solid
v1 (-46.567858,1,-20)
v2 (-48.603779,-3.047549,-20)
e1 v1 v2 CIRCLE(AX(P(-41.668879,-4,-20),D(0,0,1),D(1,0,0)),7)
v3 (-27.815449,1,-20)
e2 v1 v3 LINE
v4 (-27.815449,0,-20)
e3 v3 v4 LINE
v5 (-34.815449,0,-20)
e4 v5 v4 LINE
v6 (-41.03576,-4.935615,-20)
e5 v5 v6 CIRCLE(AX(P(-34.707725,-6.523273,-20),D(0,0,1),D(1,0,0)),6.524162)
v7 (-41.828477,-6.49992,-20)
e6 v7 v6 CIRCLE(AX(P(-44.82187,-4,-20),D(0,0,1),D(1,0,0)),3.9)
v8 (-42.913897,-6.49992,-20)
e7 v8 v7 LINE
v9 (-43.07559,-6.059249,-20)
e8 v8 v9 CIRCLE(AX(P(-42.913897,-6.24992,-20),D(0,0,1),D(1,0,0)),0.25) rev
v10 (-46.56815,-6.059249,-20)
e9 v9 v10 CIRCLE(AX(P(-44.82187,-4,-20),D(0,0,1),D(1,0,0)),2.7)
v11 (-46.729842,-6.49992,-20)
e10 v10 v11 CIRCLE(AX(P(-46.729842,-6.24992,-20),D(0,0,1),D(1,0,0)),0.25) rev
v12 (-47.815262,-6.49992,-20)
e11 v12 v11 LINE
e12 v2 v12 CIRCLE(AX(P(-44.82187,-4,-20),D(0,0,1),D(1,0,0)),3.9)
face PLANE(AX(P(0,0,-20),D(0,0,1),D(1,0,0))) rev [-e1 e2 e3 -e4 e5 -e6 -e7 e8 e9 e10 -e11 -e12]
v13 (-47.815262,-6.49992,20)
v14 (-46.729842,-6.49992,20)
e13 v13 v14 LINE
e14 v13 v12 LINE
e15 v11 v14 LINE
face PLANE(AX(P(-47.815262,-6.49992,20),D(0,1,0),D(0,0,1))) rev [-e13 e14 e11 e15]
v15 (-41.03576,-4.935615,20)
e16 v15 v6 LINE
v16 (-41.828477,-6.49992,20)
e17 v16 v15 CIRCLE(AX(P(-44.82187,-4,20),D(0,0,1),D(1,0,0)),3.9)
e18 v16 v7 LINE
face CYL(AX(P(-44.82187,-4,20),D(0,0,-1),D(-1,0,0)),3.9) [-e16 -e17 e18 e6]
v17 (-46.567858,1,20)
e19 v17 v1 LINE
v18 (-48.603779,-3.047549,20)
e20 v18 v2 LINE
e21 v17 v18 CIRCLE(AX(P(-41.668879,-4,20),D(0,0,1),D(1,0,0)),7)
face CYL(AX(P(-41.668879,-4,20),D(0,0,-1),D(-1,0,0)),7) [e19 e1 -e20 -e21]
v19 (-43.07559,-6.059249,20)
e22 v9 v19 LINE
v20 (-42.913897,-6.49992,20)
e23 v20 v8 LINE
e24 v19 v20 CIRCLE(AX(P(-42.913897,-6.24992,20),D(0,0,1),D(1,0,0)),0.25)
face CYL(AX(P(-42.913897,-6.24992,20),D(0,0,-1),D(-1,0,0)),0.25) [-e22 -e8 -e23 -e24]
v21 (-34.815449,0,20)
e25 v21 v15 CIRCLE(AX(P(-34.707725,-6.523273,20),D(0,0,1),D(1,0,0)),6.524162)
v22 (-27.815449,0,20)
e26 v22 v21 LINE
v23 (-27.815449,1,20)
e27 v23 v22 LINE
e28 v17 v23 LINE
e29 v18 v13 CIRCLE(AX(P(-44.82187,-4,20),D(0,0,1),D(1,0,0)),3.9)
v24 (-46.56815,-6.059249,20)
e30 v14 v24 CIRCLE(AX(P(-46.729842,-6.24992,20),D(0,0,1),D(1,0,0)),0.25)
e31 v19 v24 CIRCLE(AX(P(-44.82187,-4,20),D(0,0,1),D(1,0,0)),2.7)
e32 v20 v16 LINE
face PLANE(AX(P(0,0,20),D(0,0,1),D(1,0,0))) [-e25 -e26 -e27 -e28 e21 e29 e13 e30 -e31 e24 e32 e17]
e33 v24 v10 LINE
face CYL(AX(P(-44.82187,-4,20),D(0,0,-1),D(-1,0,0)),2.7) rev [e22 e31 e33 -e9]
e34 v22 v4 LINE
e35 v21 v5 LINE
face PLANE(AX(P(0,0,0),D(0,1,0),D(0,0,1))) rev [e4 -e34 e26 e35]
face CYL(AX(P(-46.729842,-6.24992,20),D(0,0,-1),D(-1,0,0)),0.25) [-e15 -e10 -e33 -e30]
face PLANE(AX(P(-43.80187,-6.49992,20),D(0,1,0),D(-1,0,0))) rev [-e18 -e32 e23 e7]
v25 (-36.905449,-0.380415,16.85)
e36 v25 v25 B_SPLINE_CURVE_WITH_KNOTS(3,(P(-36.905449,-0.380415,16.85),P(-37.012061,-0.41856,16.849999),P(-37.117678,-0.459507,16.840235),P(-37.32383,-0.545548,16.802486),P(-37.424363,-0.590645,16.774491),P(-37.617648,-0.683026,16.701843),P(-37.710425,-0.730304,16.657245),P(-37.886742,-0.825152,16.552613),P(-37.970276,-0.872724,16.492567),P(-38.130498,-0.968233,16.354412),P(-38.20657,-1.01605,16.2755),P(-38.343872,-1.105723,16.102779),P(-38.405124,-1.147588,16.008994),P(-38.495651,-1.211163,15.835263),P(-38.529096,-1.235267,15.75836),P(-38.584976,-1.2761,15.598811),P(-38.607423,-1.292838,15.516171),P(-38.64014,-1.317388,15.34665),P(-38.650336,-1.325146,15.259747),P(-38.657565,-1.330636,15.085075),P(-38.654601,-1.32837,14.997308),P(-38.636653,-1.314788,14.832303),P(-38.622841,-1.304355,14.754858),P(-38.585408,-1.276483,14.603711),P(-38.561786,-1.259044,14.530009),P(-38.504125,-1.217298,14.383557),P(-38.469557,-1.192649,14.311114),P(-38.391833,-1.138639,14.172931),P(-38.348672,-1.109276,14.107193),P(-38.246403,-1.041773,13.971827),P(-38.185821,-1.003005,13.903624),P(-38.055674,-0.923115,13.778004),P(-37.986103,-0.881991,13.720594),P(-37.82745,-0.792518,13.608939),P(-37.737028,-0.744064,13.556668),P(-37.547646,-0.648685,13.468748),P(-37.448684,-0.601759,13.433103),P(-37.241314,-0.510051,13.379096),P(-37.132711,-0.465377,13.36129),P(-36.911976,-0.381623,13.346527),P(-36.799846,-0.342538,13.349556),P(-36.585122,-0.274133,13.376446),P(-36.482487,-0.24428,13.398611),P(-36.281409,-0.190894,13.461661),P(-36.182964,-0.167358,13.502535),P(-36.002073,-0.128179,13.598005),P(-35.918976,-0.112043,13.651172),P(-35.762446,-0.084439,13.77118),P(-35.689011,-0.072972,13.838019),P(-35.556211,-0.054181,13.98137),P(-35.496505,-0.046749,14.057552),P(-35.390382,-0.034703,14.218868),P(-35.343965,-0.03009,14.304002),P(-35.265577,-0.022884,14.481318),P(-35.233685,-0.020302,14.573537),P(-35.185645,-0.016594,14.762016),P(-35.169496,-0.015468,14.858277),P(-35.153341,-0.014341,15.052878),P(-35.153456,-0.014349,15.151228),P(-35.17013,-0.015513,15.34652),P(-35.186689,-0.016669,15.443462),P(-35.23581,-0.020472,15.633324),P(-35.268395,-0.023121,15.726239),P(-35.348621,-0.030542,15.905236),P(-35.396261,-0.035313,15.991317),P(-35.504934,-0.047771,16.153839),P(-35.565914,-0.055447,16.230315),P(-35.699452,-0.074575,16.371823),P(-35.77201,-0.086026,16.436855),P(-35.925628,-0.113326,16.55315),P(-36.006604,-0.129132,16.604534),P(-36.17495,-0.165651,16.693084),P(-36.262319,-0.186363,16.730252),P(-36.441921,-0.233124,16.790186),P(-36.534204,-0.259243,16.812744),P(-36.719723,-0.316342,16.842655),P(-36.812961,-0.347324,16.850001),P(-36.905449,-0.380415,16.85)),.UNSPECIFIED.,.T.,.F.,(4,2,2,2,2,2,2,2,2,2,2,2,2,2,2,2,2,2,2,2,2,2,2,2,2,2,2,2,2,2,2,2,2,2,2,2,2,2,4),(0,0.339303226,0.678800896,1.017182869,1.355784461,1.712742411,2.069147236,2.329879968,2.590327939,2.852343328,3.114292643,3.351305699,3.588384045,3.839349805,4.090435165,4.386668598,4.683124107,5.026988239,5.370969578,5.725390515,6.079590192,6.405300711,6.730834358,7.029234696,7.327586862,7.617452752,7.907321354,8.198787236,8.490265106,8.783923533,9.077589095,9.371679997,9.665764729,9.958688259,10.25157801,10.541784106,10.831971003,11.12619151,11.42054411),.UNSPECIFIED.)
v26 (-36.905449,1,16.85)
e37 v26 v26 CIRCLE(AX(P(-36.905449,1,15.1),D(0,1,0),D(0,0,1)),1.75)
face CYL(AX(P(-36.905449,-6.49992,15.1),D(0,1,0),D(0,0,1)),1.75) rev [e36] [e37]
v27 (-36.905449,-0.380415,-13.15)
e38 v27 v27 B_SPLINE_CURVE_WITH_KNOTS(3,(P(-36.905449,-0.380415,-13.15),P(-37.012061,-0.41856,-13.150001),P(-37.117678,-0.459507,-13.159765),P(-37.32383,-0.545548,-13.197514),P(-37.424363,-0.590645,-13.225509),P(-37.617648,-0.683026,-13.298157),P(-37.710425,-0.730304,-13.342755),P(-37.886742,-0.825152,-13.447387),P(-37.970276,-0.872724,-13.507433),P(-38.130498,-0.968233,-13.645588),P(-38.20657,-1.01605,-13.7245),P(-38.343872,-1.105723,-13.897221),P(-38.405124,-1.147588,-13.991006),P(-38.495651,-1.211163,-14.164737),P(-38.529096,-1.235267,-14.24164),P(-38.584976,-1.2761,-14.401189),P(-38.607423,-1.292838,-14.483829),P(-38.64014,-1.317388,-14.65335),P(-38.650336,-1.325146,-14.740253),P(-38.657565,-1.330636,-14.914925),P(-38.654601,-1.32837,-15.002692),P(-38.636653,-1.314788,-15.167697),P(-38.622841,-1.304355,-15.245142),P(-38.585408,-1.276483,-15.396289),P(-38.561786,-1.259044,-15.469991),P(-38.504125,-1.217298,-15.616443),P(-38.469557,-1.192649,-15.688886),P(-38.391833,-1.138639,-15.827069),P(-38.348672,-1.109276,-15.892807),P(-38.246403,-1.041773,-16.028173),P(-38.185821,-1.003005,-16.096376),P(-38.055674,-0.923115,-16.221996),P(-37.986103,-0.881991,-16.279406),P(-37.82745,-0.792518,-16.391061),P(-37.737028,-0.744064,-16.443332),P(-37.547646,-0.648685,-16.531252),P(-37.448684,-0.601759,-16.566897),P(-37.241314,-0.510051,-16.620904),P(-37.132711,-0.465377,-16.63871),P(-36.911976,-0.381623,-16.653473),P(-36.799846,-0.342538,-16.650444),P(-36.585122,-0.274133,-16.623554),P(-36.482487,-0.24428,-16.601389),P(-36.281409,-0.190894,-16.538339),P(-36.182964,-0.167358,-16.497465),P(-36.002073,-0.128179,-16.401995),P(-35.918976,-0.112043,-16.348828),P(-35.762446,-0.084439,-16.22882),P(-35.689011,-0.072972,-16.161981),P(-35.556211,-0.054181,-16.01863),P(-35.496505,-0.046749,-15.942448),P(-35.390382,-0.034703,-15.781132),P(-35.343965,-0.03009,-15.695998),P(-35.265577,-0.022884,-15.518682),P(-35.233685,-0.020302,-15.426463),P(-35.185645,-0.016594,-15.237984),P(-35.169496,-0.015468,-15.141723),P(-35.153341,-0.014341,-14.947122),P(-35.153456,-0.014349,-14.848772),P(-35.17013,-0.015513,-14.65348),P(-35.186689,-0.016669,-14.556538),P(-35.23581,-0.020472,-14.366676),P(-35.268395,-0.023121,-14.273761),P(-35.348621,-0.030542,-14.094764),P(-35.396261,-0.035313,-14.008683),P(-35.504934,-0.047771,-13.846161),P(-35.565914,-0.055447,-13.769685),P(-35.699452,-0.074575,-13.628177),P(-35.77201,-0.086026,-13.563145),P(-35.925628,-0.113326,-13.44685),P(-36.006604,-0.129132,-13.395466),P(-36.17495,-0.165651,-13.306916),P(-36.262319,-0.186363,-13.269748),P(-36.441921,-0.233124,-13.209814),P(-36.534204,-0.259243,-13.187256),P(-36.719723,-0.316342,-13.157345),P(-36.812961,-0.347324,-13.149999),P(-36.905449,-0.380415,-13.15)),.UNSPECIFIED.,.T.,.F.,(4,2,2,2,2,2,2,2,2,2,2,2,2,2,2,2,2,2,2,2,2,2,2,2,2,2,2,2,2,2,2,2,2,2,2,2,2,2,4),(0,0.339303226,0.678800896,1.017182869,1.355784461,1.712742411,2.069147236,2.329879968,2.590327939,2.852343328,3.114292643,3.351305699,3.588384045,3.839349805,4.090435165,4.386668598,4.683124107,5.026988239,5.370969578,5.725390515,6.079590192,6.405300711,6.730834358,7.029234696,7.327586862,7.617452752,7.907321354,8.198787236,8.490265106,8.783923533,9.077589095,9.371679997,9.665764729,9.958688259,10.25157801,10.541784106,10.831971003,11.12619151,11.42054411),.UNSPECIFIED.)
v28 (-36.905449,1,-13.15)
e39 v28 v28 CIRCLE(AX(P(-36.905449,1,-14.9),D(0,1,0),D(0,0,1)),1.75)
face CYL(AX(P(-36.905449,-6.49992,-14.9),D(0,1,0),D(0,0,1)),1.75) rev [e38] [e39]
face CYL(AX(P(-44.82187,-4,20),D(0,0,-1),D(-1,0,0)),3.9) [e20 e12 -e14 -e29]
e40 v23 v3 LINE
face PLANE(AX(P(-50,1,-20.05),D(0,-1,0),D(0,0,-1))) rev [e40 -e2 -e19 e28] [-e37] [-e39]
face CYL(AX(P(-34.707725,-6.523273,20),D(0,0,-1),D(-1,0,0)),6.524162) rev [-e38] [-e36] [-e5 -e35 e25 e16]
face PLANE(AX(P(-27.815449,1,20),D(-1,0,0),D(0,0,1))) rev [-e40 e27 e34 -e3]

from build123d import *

# Parameters (mm, degrees)
EXTRUDE_1_DEPTH                            = 3.9
EXTRUDE_3_DEPTH                            = 20
EXTRUDE_5_DEPTH                            = 20
FILLET_1_R                                 = 0.25
FILLET_1_OF_MIRROR_2_R                     = 0.25
SKETCH_7_R                                 = 5.5
CUT_EXTRUDE_3_DEPTH                        = 69.146236458
MIRROR_3_AT_THE_SECOND_PLANE_COPY_1_SKET_R = 5.5
MIRROR_3_AT_THE_SECOND_PLANE_COPY_1_DEPTH  = 69.146236458
ESQUISSE1_W                                = 44.6
ESQUISSE1_H                                = 40
ENL_V_MAT_EXTRU_1_DEPTH                    = 1.54
ENL_V_MAT_EXTRU_2_DEPTH                    = 57.761068742
ESQUISSE3_W                                = 50
ESQUISSE3_H                                = 1.36
ENL_V_MAT_EXTRU_3_DEPTH                    = 64.372466761
ESQUISSE4_W                                = 27.815449133
ESQUISSE4_H                                = 40
ENL_V_MAT_EXTRU_4_DEPTH                    = 54.066651895
ESQUISSE5_R                                = 1.75
ENL_V_MAT_EXTRU_5_DEPTH                    = 54.198396436


with BuildPart() as part:
    # Эскиз1 → Бобышка-Вытянуть1 (new body)
    with BuildSketch(Plane(origin=(0, 0, 0), x_dir=(1, 0, 0), z_dir=(0, 1, 0))):
        with BuildLine():
            ThreePointArc((-44.6, -23.2), (-43.428427125, -26.028427125), (-40.6, -27.2))
            Line((-40.6, -27.2), (40.6, -27.2))
            ThreePointArc((40.6, -27.2), (43.428427125, -26.028427125), (44.6, -23.2))
            Line((44.6, -23.2), (44.6, 23.2))
            ThreePointArc((44.6, 23.2), (43.428427125, 26.028427125), (40.6, 27.2))
            Line((40.6, 27.2), (33.6, 27.2))
            Line((33.6, 27.2), (-5.4, 27.2))
            Line((-5.4, 27.2), (-40.6, 27.2))
            ThreePointArc((-40.6, 27.2), (-43.428427125, 26.028427125), (-44.6, 23.2))
            Line((-44.6, 23.2), (-44.6, -23.2))
        make_face()
    extrude(amount=EXTRUDE_1_DEPTH)



with BuildPart() as body_2:
    # Эскиз3 → Бобышка-Вытянуть3 (new, symmetric)
    with BuildSketch(Plane.XY):
        with BuildLine():
            Line((-47.815262386, -6.499919999), (-45.841869662, -6.499919999))
            ThreePointArc((-45.841869662, -6.499919999), (-44.821869662, -1.3), (-43.801869662, -6.499919999))
            Line((-43.801869662, -6.499919999), (-41.828476938, -6.499919999))
            ThreePointArc((-41.828476938, -6.499919999), (-44.821869662, -0.1), (-47.815262386, -6.499919999))
        make_face()
    extrude_3 = extrude(amount=EXTRUDE_3_DEPTH, both=True)


with BuildPart() as part_1:
    add(part.part)

    add(body_2.part)  # Бобышка-Вытянуть5 merges body 2
    # Эскиз5 → Бобышка-Вытянуть5 (add, symmetric)
    with BuildSketch(Plane.XY):
        with BuildLine():
            ThreePointArc((-41.631827579, 2.999901942), (-46.932438451, 0.61464415), (-48.60377877, -4.952451312))
            Line((-48.60377877, -4.952451312), (-47.348297278, -4.952451312))
            ThreePointArc((-47.348297278, -4.952451312), (-44.821869662, -1.3), (-42.295442046, -4.952451312))
            Line((-42.295442046, -4.952451312), (-41.039960555, -4.952451312))
            ThreePointArc((-41.039960555, -4.952451312), (-38.684888017, -1.351535806), (-34.6, 0))
            Line((-34.6, 0), (-36.641600827, 0.870983001))
            ThreePointArc((-36.641600827, 0.870983001), (-38.922074934, 2.438561027), (-41.631827579, 2.999901942))
        make_face()
    extrude_5 = extrude(amount=EXTRUDE_5_DEPTH, both=True)

    # Скругление1
    fillet_1_edges = [part_1.edges().sort_by_distance(p)[0] for p in [
        (-43.801869662, -6.499919999, 0),
        (-45.841869662, -6.499919999, 0),
    ]]
    fillet(fillet_1_edges, radius=FILLET_1_R)

    # Зеркальное отражение1: Бобышка-Вытянуть5 across plane
    add(extrude_5.mirror(Plane(origin=(0, 0, 0), x_dir=(0, 0, 1), z_dir=(1, 0, 0))))

    # Зеркальное отражение2: Бобышка-Вытянуть3 across plane
    add(extrude_3.mirror(Plane(origin=(0, 0, 0), x_dir=(0, 0, 1), z_dir=(1, 0, 0))))

    # Скругление1 of Зеркальное отражение2
    fillet_1_of_mirror_2_edges = [part_1.edges().sort_by_distance(p)[0] for p in [
        (43.801869662, -6.499919999, 0),
        (45.841869662, -6.499919999, 0),
    ]]
    fillet(fillet_1_of_mirror_2_edges, radius=FILLET_1_OF_MIRROR_2_R)

    # Эскиз7 → Вырез-Вытянуть3 (cut, through all)
    with BuildSketch(Plane.XY.offset(20)):
        with Locations((-45, -4)):
            Circle(SKETCH_7_R)
    cut_extrude_3 = extrude(amount=CUT_EXTRUDE_3_DEPTH, mode=Mode.SUBTRACT)

    # Зеркальное отражение3: Вырез-Вытянуть3 across plane
    add(cut_extrude_3.mirror(Plane(origin=(0, 0, 0), x_dir=(0, 0, 1), z_dir=(1, 0, 0))), mode=Mode.SUBTRACT)

    # Зеркальное отражение3 at the second plane: Вырез-Вытянуть3 across plane
    add(cut_extrude_3.mirror(Plane.XY), mode=Mode.SUBTRACT)

    # Зеркальное отражение3 at the second plane copy 1 sket → Зеркальное отражение3 at the second plane copy 1 (cut, through all)
    with BuildSketch(Plane(origin=(0, 0, -20), x_dir=(-1, 0, 0), z_dir=(0, 0, -1))):
        with Locations((-45, -4)):
            Circle(MIRROR_3_AT_THE_SECOND_PLANE_COPY_1_SKET_R)
    extrude(amount=MIRROR_3_AT_THE_SECOND_PLANE_COPY_1_DEPTH, mode=Mode.SUBTRACT)

    # Esquisse1 → Enlèv. mat.-Extru.1 (cut)
    with BuildSketch(Plane(origin=(0, 3.9, 0), x_dir=(1, 0, 0), z_dir=(0, 1, 0))):
        with Locations((-22.3, 0)):
            Rectangle(ESQUISSE1_W, ESQUISSE1_H)
    extrude(amount=-ENL_V_MAT_EXTRU_1_DEPTH, mode=Mode.SUBTRACT)

    # Esquisse2 → Enlèv. mat.-Extru.2 (cut, through all)
    with BuildSketch(Plane(origin=(0, 3.9, 0), x_dir=(1, 0, 0), z_dir=(0, 1, 0))):
        Polygon((-44.6, 20), (-44.6, 27.2), (51.6, 27.2), (51.6, -27.2), (-44.6, -27.2), (-44.6, -20), (0, -20), (0, 20), align=None)
    extrude(amount=-ENL_V_MAT_EXTRU_2_DEPTH, mode=Mode.SUBTRACT)

    # Esquisse3 → Enlèv. mat.-Extru.3 (cut, through all)
    with BuildSketch(Plane.XY.offset(20)):
        with Locations((-25, 1.68)):
            Rectangle(ESQUISSE3_W, ESQUISSE3_H)
    extrude(amount=-ENL_V_MAT_EXTRU_3_DEPTH, mode=Mode.SUBTRACT)

    # Esquisse4 → Enlèv. mat.-Extru.4 (cut, through all)
    with BuildSketch(Plane.XZ):
        with Locations((-13.907724567, 0)):
            Rectangle(ESQUISSE4_W, ESQUISSE4_H)
    extrude(amount=-ENL_V_MAT_EXTRU_4_DEPTH, mode=Mode.SUBTRACT)

    # Esquisse5 → Enlèv. mat.-Extru.5 (cut, through all)
    with BuildSketch(Plane(origin=(0, 1, 0), x_dir=(1, 0, 0), z_dir=(0, 1, 0))):
        with Locations((-36.905449133, 14.9)):
            Circle(ESQUISSE5_R)
        with Locations((-36.905449133, -15.1)):
            Circle(ESQUISSE5_R)
    extrude(amount=-ENL_V_MAT_EXTRU_5_DEPTH, mode=Mode.SUBTRACT)


solid = part_1.part
